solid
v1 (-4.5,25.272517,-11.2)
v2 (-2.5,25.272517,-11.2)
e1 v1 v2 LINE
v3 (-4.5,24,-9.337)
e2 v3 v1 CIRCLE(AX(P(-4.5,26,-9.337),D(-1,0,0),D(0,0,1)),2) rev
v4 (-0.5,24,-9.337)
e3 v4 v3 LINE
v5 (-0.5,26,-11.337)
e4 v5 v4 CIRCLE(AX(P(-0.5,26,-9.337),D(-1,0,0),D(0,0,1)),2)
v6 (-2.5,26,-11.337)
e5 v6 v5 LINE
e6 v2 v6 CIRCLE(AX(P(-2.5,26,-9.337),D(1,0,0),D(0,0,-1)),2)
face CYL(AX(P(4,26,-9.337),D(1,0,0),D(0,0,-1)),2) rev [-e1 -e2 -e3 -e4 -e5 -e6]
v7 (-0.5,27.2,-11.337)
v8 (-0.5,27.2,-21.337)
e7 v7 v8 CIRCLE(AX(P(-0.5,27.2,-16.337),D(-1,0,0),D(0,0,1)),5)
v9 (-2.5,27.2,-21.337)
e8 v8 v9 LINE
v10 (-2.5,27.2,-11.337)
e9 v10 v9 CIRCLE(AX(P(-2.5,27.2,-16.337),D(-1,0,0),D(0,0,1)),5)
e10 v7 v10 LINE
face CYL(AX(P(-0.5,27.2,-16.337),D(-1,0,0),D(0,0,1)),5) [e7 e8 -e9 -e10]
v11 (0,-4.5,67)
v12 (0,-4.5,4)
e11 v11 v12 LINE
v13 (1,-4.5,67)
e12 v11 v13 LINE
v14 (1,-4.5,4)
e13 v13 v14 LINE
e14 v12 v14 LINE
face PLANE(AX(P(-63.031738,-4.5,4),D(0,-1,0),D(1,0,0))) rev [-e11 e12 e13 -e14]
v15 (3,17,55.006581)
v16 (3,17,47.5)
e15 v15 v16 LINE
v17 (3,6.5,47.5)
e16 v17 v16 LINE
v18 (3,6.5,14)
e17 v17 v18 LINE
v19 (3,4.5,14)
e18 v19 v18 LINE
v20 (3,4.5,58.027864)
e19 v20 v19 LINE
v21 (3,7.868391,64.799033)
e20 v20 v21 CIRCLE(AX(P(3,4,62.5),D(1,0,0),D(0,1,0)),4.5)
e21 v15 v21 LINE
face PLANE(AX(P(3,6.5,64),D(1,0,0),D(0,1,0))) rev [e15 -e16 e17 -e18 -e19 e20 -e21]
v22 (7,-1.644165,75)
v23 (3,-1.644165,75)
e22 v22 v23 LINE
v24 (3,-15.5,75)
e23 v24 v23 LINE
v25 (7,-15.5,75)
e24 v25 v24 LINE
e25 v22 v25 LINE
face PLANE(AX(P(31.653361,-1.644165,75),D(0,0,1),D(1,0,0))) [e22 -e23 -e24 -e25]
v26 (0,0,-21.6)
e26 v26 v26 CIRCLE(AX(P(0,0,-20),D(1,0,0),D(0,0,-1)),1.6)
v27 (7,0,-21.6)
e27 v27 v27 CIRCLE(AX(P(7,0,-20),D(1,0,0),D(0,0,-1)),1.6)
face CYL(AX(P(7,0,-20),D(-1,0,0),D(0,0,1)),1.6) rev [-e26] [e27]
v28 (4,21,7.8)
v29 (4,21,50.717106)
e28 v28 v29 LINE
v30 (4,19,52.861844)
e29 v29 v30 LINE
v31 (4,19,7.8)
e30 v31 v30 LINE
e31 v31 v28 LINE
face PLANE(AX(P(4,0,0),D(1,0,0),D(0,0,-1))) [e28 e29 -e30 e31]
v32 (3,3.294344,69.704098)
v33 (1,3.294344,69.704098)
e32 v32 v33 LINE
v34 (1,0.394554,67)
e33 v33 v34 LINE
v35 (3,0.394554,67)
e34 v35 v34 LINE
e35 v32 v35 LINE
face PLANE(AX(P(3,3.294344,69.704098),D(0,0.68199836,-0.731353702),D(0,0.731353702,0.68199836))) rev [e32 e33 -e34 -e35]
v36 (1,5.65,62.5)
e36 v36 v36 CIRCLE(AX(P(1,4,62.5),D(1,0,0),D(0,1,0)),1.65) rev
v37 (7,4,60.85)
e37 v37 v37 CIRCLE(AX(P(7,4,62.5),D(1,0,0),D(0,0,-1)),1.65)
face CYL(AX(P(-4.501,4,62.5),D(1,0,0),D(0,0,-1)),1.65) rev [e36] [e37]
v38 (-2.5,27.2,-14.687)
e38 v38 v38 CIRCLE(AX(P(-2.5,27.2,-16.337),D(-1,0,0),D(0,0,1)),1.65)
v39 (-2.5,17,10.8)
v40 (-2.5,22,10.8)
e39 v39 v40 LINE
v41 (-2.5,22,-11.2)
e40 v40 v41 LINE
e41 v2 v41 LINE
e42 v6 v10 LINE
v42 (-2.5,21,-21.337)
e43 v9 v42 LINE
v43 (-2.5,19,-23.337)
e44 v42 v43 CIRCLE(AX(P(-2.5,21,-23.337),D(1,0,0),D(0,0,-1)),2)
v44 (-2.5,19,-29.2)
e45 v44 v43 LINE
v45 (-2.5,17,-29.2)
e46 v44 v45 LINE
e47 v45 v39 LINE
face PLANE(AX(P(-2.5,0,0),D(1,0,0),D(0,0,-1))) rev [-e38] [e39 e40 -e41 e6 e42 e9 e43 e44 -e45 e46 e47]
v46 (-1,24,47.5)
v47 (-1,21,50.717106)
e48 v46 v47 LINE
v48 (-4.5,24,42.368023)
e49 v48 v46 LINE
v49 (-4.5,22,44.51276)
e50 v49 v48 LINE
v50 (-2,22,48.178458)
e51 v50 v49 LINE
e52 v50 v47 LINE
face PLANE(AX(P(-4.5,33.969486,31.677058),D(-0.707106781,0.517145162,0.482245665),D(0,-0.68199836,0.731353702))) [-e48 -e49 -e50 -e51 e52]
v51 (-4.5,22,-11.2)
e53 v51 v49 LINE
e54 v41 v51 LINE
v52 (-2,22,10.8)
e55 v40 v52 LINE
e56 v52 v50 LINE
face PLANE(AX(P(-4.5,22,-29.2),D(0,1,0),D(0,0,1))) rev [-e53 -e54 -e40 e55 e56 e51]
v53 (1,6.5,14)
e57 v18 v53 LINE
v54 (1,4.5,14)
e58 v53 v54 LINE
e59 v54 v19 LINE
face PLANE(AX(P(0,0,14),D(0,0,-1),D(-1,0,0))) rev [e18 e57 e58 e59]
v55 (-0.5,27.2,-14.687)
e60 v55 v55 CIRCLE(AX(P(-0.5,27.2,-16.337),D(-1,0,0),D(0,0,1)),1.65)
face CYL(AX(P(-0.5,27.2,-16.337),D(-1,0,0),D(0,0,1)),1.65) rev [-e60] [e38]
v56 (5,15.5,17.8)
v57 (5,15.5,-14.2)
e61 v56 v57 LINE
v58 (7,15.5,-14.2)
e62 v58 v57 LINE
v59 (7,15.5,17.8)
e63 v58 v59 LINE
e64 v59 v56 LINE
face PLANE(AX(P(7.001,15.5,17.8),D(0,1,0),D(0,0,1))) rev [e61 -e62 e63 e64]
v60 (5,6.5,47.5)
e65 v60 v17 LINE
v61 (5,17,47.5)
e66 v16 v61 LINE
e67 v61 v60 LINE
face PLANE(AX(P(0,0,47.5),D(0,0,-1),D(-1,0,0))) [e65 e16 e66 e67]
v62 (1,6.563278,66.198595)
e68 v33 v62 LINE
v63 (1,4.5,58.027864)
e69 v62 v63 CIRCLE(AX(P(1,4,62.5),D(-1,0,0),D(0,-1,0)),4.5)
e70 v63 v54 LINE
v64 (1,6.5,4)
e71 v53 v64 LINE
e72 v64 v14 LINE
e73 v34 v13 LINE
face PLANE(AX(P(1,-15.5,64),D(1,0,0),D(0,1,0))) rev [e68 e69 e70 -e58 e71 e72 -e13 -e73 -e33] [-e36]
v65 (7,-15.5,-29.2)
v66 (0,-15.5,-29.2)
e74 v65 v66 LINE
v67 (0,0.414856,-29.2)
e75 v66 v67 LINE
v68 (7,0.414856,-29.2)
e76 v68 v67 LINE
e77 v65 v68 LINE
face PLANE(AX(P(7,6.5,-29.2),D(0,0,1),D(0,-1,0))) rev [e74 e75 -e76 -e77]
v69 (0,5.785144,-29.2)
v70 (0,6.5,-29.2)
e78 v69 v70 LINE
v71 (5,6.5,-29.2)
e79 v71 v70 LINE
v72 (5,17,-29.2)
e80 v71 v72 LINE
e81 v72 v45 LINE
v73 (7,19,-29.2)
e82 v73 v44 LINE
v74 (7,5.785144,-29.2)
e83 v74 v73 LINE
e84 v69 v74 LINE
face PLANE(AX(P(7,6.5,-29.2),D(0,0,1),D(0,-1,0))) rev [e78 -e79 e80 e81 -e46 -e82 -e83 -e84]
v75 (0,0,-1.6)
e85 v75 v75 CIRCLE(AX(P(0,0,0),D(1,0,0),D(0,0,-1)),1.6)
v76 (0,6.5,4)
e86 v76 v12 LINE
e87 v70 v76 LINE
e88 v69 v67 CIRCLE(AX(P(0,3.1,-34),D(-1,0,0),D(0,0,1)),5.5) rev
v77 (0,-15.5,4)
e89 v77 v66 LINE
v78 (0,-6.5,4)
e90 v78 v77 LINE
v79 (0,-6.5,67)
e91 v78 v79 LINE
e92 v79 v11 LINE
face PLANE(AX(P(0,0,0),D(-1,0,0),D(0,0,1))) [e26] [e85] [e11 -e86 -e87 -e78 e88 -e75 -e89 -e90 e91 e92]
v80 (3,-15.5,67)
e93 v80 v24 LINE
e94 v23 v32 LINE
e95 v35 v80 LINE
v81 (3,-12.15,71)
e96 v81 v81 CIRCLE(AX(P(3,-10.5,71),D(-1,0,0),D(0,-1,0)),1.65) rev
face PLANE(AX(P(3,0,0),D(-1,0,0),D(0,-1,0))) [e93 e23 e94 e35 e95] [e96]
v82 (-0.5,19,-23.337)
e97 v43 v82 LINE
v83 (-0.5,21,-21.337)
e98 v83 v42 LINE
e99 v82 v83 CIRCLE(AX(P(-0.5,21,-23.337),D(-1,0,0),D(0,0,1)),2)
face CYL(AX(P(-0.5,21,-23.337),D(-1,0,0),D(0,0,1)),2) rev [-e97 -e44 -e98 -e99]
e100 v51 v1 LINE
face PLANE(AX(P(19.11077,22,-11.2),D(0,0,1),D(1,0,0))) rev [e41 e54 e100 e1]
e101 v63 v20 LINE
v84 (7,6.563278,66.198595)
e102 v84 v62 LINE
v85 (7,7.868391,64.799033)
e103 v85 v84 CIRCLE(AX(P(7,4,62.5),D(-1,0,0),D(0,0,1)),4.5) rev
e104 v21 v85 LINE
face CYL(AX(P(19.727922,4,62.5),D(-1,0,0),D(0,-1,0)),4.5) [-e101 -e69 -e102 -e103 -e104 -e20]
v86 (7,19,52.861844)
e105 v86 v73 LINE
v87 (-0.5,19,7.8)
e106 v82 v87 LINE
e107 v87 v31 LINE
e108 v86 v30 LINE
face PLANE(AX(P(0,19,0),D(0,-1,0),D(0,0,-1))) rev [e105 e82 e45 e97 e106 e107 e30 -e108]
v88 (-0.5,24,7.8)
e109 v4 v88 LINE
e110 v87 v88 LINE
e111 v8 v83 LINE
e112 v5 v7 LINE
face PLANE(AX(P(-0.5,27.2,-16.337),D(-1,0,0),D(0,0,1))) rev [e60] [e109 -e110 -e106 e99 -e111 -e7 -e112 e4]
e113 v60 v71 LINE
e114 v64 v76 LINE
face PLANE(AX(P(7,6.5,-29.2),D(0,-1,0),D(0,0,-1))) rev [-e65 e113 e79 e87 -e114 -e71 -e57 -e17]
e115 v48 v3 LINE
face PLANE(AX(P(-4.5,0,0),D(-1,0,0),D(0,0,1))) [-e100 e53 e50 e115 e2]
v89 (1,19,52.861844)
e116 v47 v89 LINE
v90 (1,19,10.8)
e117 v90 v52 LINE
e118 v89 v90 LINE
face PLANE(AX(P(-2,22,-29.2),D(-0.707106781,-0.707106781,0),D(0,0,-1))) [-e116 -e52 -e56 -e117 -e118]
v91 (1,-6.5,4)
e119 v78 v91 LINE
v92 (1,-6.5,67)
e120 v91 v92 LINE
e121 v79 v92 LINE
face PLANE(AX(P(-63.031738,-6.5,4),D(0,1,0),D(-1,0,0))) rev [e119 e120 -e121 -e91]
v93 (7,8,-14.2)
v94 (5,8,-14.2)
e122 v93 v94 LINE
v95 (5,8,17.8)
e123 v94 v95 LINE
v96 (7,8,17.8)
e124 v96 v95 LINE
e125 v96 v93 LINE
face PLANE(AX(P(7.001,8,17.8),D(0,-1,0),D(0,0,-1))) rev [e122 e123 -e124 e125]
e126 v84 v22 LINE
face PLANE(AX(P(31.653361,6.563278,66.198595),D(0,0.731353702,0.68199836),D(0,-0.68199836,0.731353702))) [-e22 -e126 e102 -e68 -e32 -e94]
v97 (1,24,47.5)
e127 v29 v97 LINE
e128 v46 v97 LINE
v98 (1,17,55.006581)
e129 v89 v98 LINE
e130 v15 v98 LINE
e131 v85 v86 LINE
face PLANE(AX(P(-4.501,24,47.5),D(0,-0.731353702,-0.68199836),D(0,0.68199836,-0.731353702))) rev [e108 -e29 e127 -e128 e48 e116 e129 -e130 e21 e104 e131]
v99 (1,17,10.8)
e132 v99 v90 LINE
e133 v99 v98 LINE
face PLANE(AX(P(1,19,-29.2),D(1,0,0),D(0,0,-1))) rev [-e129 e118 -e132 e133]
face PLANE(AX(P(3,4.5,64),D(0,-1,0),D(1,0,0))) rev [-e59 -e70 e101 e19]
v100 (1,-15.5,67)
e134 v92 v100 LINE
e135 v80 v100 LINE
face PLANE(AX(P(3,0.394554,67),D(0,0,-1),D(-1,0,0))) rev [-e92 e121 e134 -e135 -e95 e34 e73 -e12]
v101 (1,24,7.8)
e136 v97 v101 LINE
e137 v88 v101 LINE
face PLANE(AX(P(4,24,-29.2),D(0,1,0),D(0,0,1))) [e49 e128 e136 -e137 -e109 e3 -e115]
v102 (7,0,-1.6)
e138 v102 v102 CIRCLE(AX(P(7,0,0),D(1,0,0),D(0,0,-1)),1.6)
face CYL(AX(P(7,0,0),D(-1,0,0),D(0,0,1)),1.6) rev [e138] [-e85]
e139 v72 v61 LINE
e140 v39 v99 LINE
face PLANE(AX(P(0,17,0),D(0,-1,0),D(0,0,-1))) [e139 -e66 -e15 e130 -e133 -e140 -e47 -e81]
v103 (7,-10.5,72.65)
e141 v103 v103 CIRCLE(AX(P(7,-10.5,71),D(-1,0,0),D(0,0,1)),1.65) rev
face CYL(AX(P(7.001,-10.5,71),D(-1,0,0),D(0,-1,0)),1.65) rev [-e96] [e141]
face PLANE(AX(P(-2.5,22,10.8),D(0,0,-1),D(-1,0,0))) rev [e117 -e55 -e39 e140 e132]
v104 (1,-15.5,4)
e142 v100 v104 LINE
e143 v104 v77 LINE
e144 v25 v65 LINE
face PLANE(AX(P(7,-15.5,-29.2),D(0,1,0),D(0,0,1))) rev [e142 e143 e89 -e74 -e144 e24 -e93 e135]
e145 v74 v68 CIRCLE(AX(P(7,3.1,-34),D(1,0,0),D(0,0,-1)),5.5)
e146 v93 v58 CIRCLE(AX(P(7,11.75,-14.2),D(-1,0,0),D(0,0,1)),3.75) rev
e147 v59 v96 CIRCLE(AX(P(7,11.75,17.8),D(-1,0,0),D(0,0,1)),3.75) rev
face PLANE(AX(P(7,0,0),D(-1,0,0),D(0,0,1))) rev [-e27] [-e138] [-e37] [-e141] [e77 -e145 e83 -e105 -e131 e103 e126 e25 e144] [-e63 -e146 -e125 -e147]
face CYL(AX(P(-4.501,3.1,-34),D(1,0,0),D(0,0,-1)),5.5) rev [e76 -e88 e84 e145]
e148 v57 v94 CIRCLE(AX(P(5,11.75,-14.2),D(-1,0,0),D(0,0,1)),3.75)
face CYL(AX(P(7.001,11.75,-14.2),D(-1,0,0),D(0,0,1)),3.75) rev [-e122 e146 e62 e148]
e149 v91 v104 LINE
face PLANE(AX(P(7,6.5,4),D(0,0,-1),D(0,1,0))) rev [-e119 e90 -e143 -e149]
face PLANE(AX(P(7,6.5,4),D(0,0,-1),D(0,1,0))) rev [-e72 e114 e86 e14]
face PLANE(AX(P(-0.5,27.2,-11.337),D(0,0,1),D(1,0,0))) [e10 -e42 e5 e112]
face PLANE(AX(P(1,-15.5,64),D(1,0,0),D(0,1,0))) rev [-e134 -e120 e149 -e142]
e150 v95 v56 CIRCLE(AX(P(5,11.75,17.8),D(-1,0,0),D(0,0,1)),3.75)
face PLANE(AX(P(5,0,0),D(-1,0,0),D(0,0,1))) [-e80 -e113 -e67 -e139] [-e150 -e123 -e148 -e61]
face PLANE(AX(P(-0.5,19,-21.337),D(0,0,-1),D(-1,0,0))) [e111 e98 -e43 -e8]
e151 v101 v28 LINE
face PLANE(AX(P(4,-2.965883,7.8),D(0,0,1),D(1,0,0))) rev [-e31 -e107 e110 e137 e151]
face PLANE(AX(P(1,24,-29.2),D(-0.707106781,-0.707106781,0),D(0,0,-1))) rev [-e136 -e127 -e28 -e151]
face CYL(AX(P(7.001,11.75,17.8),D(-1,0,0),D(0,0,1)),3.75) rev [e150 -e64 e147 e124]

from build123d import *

# Parameters (mm, degrees)
SKETCH_1_W           = 33.2
SKETCH_1_H           = 22
SKETCH_1_R           = 1.6
EXTRUDE_1_DEPTH      = 7
SKETCH_2_W           = 33.2
SKETCH_2_H           = 10.5
EXTRUDE_2_DEPTH      = 2
EXTRUDE_3_DEPTH      = 60
SKETCH_4_W           = 2
SKETCH_4_H           = 10.5
EXTRUDE_4_DEPTH      = 38.5
SKETCH_5_W           = 4
SKETCH_5_H           = 10.5
EXTRUDE_5_DEPTH      = 2
SKETCH_6_W           = 4
SKETCH_6_H           = 10.5
EXTRUDE_6_DEPTH      = 19.5
SKETCH_7_W           = 6
SKETCH_7_H           = 93.2
EXTRUDE_7_DEPTH      = 2
SKETCH_8_W           = 93.2
SKETCH_8_H           = 5
EXTRUDE_8_DEPTH      = 3
SKETCH_10_W          = 93.2
SKETCH_10_H          = 2
EXTRUDE_9_DEPTH      = 5.5
SKETCH_12_W          = 18
SKETCH_12_H          = 2
CUT_EXTRUDE_1_DEPTH  = 5.5
SKETCH_13_W          = 40
SKETCH_13_H          = 5
EXTRUDE_10_DEPTH     = 3.5
CUT_EXTRUDE_2_REACH  = 70.879
SKETCH_15_W          = 15.5
SKETCH_15_H          = 5
SKETCH_16_W          = 3.5
SKETCH_16_H          = 2.5
EXTRUDE_12_DEPTH     = 2
CUT_EXTRUDE_3_REACH  = 71.313
CHAMFER_1_SIZE       = 3.5
SKETCH_18_R          = 1.65
EXTRUDE_13_DEPTH     = 2
FILLET_1_R           = 2
SKETCH_19_W          = 4.5
SKETCH_19_H          = 21.5
CUT_EXTRUDE_4_DEPTH  = 5
CHAMFER_2_SIZE       = 3
CUT_EXTRUDE_5_REACH  = 74.561
SKETCH_20_R          = 1.65
EXTRUDE_14_REACH     = 73.895
SKETCH_21_R          = 4.5
SKETCH_21_R_2        = 1.65
EXTRUDE_15_DEPTH     = 6
EXTRUDE_16_DEPTH     = 4
CUT_EXTRUDE_6_REACH  = 83.84
SKETCH_24_R          = 1.65
CUT_EXTRUDE_7_REACH  = 84.171
SKETCH_26_W          = 2
SKETCH_26_H          = 10.5
CUT_EXTRUDE_8_DEPTH  = 5
SKETCH_27_W          = 2
SKETCH_27_H          = 2
EXTRUDE_17_DEPTH     = 10
CUT_EXTRUDE_9_DEPTH  = 2
CUT_EXTRUDE_10_REACH = 84.426
SKETCH_29_R          = 5.5
SKETCH_30_W          = 63
SKETCH_30_H          = 2
EXTRUDE_18_DEPTH     = 1


with BuildPart() as part:
    # 草图1 → 凸台-拉伸1 (new body)
    with BuildSketch(Plane(origin=(0, 0, 0), x_dir=(0, 0, -1), z_dir=(1, 0, 0))):
        with Locations((12.6, -4.5)):
            Rectangle(SKETCH_1_W, SKETCH_1_H)
        Circle(SKETCH_1_R, mode=Mode.SUBTRACT)
        with Locations((20, 0)):
            Circle(SKETCH_1_R, mode=Mode.SUBTRACT)
    extrude(amount=EXTRUDE_1_DEPTH)

    # 草图2 → 凸台-拉伸2 (add)
    with BuildSketch(Plane(origin=(7, 0, 0), x_dir=(0, 0, -1), z_dir=(1, 0, 0))):
        with Locations((12.6, 11.75)):
            Rectangle(SKETCH_2_W, SKETCH_2_H)
    extrude(amount=-EXTRUDE_2_DEPTH)

    # 草图3 → 凸台-拉伸3 (add)
    with BuildSketch(Plane.XY.offset(4)):
        Polygon((7, -15.5), (1, -15.5), (1, 4.5), (3, 4.5), (3, 6.5), (7, 6.5), align=None)
    extrude(amount=EXTRUDE_3_DEPTH)

    # 草图4 → 凸台-拉伸4 (add)
    with BuildSketch(Plane.XY.offset(4)):
        with Locations((6, 11.75)):
            Rectangle(SKETCH_4_W, SKETCH_4_H)
    extrude(amount=EXTRUDE_4_DEPTH)

    # 草图5 → 凸台-拉伸5 (add)
    with BuildSketch(Plane.XY.offset(42.5)):
        with Locations((5, 11.75)):
            Rectangle(SKETCH_5_W, SKETCH_5_H)
    extrude(amount=EXTRUDE_5_DEPTH)

    # 草图6 → 凸台-拉伸6 (add)
    with BuildSketch(Plane.XY.offset(44.5)):
        with Locations((5, 11.75)):
            Rectangle(SKETCH_6_W, SKETCH_6_H)
    extrude(amount=EXTRUDE_6_DEPTH)

    # 草图7 → 凸台-拉伸7 (add)
    with BuildSketch(Plane(origin=(0, 17, 0), x_dir=(1, 0, 0), z_dir=(0, 1, 0))):
        with Locations((4, -17.4)):
            Rectangle(SKETCH_7_W, SKETCH_7_H)
    extrude(amount=EXTRUDE_7_DEPTH)

    # 草图8 → 凸台-拉伸8 (add)
    with BuildSketch(Plane.ZY.offset(-1)):
        with Locations((17.4, 21.5)):
            Rectangle(SKETCH_8_W, SKETCH_8_H)
    extrude(amount=-EXTRUDE_8_DEPTH)

    # 草图10 → 凸台-拉伸9 (add)
    with BuildSketch(Plane.ZY.offset(-1)):
        with Locations((17.4, 23)):
            Rectangle(SKETCH_10_W, SKETCH_10_H)
    extrude(amount=EXTRUDE_9_DEPTH)

    # 草图12 → 切除-拉伸1 (cut)
    with BuildSketch(Plane.ZY.offset(4.5)):
        with Locations((-20.2, 23)):
            Rectangle(SKETCH_12_W, SKETCH_12_H)
    extrude(amount=-CUT_EXTRUDE_1_DEPTH, mode=Mode.SUBTRACT)

    # 草图13 → 凸台-拉伸10 (add)
    with BuildSketch(Plane.ZY.offset(-1)):
        with Locations((-9.2, 19.5)):
            Rectangle(SKETCH_13_W, SKETCH_13_H)
    extrude(amount=EXTRUDE_10_DEPTH)

    # 草图15 → 切除-拉伸2 (cut, up to next)
    with BuildSketch(Plane(origin=(4, 0, 0), x_dir=(0, 0, -1), z_dir=(1, 0, 0)), mode=Mode.PRIVATE) as cut_extrude_2_sk1:
        with Locations((21.45, 21.5)):
            Rectangle(SKETCH_15_W, SKETCH_15_H)
    cut_extrude_2_tool1 = extrude(cut_extrude_2_sk1.sketch, amount=-CUT_EXTRUDE_2_REACH, mode=Mode.PRIVATE) & part.part
    add(cut_extrude_2_tool1.solids().sort_by_distance((4, 21.5, -21.45))[0], mode=Mode.SUBTRACT)

    # 草图16 → 凸台-拉伸12 (add)
    with BuildSketch(Plane(origin=(0, 22, 0), x_dir=(1, 0, 0), z_dir=(0, 1, 0))):
        with Locations((-0.75, 12.45)):
            Rectangle(SKETCH_16_W, SKETCH_16_H)
    extrude(amount=EXTRUDE_12_DEPTH)

    # 草图17 → 切除-拉伸3 (cut, up to next)
    with BuildSketch(Plane(origin=(7, 0, 0), x_dir=(0, 0, -1), z_dir=(1, 0, 0)), mode=Mode.PRIVATE) as cut_extrude_3_sk1:
        Polygon((-47.5, 24), (-64, 8.613501079), (-64, 24), align=None)
    cut_extrude_3_tool1 = extrude(cut_extrude_3_sk1.sketch, amount=-CUT_EXTRUDE_3_REACH, mode=Mode.PRIVATE) & part.part
    add(cut_extrude_3_tool1.solids().sort_by_distance((7, 18.871167, 58.5))[0], mode=Mode.SUBTRACT)

    # 倒角1
    # the kernel refuses this chamfer: 3.5 mm, written as the material it takes off along each edge
    with BuildSketch(Plane(origin=(-4.5, 15.861407469, 56.227571974), x_dir=(0.9996219169112969, 0.020109211138415985, 0.018752142756900524), z_dir=(0, 0.6819983600625026, -0.7313537016191667))) as chamfer_1_piece_1:
        Polygon((CHAMFER_1_SIZE * 0.999621916911, CHAMFER_1_SIZE * 0.0274958766106), (-CHAMFER_1_SIZE * 0.0274958766106, CHAMFER_1_SIZE * 0.999621916911), (0, 0), align=None)
    extrude(amount=20.934339287, mode=Mode.SUBTRACT)

    # 草图18 → 凸台-拉伸13 (add)
    with BuildSketch(Plane.ZY.offset(2.5)):
        with BuildLine():
            Line((-11.337, 27.2), (-11.337, 24))
            Line((-11.337, 24), (-13.7, 24))
            Line((-13.7, 24), (-13.7, 19))
            Line((-13.7, 19), (-21.337, 19))
            Line((-21.337, 19), (-21.337, 27.2))
            ThreePointArc((-21.337, 27.2), (-16.337, 32.2), (-11.337, 27.2))
        make_face()
        with Locations((-16.337, 27.2)):
            Circle(SKETCH_18_R, mode=Mode.SUBTRACT)
    extrude(amount=-EXTRUDE_13_DEPTH)

    # 圆角1
    fillet_1_edges = [part.edges().sort_by_distance(p)[0] for p in [
        (-1.5, 24, -11.337),
        (-1.5, 19, -21.337),
    ]]
    fillet(fillet_1_edges, radius=FILLET_1_R)

    # 草图19 → 切除-拉伸4 (cut)
    with BuildSketch(Plane(origin=(0, 24, 0), x_dir=(1, 0, 0), z_dir=(0, 1, 0))):
        with Locations((1.75, 2.95)):
            Rectangle(SKETCH_19_W, SKETCH_19_H)
    extrude(amount=-CUT_EXTRUDE_4_DEPTH, mode=Mode.SUBTRACT)

    # 倒角2
    chamfer_2_edges = [part.edges().sort_by_distance(p)[0] for p in [
        (4, 24, 27.65),
        (1, 22, 30.22236871),
    ]]
    chamfer(chamfer_2_edges, length=CHAMFER_2_SIZE)

    # 草图20 → 切除-拉伸5 (cut, up to next)
    with BuildSketch(Plane(origin=(7, 0, 0), x_dir=(0, 0, -1), z_dir=(1, 0, 0)), mode=Mode.PRIVATE) as cut_extrude_5_sk1:
        with Locations((-62.5, 4)):
            Circle(SKETCH_20_R)
    cut_extrude_5_tool1 = extrude(cut_extrude_5_sk1.sketch, amount=-CUT_EXTRUDE_5_REACH, mode=Mode.PRIVATE) & part.part
    add(cut_extrude_5_tool1.solids().sort_by_distance((7, 4, 62.5))[0], mode=Mode.SUBTRACT)

    # 凸台-拉伸14: up to this face of the body (flat: up to its plane)
    extrude_14_end = Plane(part.part.faces().sort_by_distance((7, 1.498387626, 16.627822956))[0])
    # 草图21 → 凸台-拉伸14 (add, up to the picked face)
    with BuildSketch(Plane.ZY.offset(-1), mode=Mode.PRIVATE) as extrude_14_sk1:
        with Locations((62.5, 4)):
            Circle(SKETCH_21_R)
        with Locations(Location((62.5, 4, 0), (0, 0, 180))):
            Circle(SKETCH_21_R_2, mode=Mode.SUBTRACT)
    extrude_14_tool1 = split(extrude(extrude_14_sk1.sketch, amount=-EXTRUDE_14_REACH, mode=Mode.PRIVATE), bisect_by=extrude_14_end, keep=Keep.BOTH, mode=Mode.PRIVATE)
    add(extrude_14_tool1.solids().sort_by(Axis((1, 4, 58.127279), (1, 0, 0)))[0])

    # 草图22 → 凸台-拉伸15 (add)
    with BuildSketch(Plane.ZY.offset(-1)):
        with BuildLine():
            Line((66.198595209, 6.563277878), (75, -1.644164869))
            Line((75, -1.644164869), (75, -15.5))
            Line((75, -15.5), (64, -15.5))
            Line((64, -15.5), (64, -0.242640687))
            ThreePointArc((64, -0.242640687), (66.782111619, 2.616699568), (66.198595209, 6.563277878))
        make_face()
    extrude(amount=-EXTRUDE_15_DEPTH)

    # 草图23 → 凸台-拉伸16 (add)
    with BuildSketch(Plane(origin=(7, 0, 0), x_dir=(0, 0, -1), z_dir=(1, 0, 0))):
        Polygon((-64, 8.613501079), (-64.799032902, 7.868390843), (-64, 8.242640687), align=None)
    extrude(amount=-EXTRUDE_16_DEPTH)

    # 草图24 → 切除-拉伸6 (cut, up to next)
    with BuildSketch(Plane.ZY.offset(-1), mode=Mode.PRIVATE) as cut_extrude_6_sk1:
        with Locations(Location((71, -10.5, 0), (0, 0, 270))):
            Circle(SKETCH_24_R)
    cut_extrude_6_tool1 = extrude(cut_extrude_6_sk1.sketch, amount=-CUT_EXTRUDE_6_REACH, mode=Mode.PRIVATE) & part.part
    add(cut_extrude_6_tool1.solids().sort_by_distance((1, -10.5, 71))[0], mode=Mode.SUBTRACT)

    # 草图25 → 切除-拉伸7 (cut, up to next)
    with BuildSketch(Plane.ZY.offset(-5), mode=Mode.PRIVATE) as cut_extrude_7_sk1:
        with BuildLine():
            Line((17.8, 8), (-14.2, 8))
            ThreePointArc((-14.2, 8), (-17.95, 11.75), (-14.2, 15.5))
            Line((-14.2, 15.5), (17.8, 15.5))
            ThreePointArc((17.8, 15.5), (21.55, 11.75), (17.8, 8))
        make_face()
    cut_extrude_7_tool1 = extrude(cut_extrude_7_sk1.sketch, amount=-CUT_EXTRUDE_7_REACH, mode=Mode.PRIVATE) & part.part
    add(cut_extrude_7_tool1.solids().sort_by_distance((5, 11.75, 1.8))[0], mode=Mode.SUBTRACT)

    # 草图26 → 切除-拉伸8 (cut)
    with BuildSketch(Plane(origin=(0, 0, 42.5), x_dir=(-1, 0, 0), z_dir=(0, 0, -1))):
        with Locations((-4, 11.75)):
            Rectangle(SKETCH_26_W, SKETCH_26_H)
    extrude(amount=-CUT_EXTRUDE_8_DEPTH, mode=Mode.SUBTRACT)

    # 草图27 → 凸台-拉伸17 (add)
    with BuildSketch(Plane.XY.offset(4)):
        with Locations((2, 5.5)):
            Rectangle(SKETCH_27_W, SKETCH_27_H)
    extrude(amount=EXTRUDE_17_DEPTH)

    # 草图28 → 切除-拉伸9 (cut)
    with BuildSketch(Plane.ZY.offset(-1)):
        Polygon((67, 0.394553878), (67, -15.5), (75, -15.5), (75, -1.644164869), (69.70409784, 3.29434379), align=None)
    extrude(amount=-CUT_EXTRUDE_9_DEPTH, mode=Mode.SUBTRACT)

    # 草图29 → 切除-拉伸10 (cut, up to next)
    with BuildSketch(Plane(origin=(7, 0, 0), x_dir=(0, 0, -1), z_dir=(1, 0, 0)), mode=Mode.PRIVATE) as cut_extrude_10_sk1:
        with Locations((34, 3.1)):
            Circle(SKETCH_29_R)
    cut_extrude_10_tool1 = extrude(cut_extrude_10_sk1.sketch, amount=-CUT_EXTRUDE_10_REACH, mode=Mode.PRIVATE) & part.part
    add(cut_extrude_10_tool1.solids().sort_by_distance((7, 3.1, -34))[0], mode=Mode.SUBTRACT)

    # 草图30 → 凸台-拉伸18 (add)
    with BuildSketch(Plane.ZY.offset(-1)):
        with Locations((35.5, -5.5)):
            Rectangle(SKETCH_30_W, SKETCH_30_H)
    extrude(amount=EXTRUDE_18_DEPTH)


solid = part.part
